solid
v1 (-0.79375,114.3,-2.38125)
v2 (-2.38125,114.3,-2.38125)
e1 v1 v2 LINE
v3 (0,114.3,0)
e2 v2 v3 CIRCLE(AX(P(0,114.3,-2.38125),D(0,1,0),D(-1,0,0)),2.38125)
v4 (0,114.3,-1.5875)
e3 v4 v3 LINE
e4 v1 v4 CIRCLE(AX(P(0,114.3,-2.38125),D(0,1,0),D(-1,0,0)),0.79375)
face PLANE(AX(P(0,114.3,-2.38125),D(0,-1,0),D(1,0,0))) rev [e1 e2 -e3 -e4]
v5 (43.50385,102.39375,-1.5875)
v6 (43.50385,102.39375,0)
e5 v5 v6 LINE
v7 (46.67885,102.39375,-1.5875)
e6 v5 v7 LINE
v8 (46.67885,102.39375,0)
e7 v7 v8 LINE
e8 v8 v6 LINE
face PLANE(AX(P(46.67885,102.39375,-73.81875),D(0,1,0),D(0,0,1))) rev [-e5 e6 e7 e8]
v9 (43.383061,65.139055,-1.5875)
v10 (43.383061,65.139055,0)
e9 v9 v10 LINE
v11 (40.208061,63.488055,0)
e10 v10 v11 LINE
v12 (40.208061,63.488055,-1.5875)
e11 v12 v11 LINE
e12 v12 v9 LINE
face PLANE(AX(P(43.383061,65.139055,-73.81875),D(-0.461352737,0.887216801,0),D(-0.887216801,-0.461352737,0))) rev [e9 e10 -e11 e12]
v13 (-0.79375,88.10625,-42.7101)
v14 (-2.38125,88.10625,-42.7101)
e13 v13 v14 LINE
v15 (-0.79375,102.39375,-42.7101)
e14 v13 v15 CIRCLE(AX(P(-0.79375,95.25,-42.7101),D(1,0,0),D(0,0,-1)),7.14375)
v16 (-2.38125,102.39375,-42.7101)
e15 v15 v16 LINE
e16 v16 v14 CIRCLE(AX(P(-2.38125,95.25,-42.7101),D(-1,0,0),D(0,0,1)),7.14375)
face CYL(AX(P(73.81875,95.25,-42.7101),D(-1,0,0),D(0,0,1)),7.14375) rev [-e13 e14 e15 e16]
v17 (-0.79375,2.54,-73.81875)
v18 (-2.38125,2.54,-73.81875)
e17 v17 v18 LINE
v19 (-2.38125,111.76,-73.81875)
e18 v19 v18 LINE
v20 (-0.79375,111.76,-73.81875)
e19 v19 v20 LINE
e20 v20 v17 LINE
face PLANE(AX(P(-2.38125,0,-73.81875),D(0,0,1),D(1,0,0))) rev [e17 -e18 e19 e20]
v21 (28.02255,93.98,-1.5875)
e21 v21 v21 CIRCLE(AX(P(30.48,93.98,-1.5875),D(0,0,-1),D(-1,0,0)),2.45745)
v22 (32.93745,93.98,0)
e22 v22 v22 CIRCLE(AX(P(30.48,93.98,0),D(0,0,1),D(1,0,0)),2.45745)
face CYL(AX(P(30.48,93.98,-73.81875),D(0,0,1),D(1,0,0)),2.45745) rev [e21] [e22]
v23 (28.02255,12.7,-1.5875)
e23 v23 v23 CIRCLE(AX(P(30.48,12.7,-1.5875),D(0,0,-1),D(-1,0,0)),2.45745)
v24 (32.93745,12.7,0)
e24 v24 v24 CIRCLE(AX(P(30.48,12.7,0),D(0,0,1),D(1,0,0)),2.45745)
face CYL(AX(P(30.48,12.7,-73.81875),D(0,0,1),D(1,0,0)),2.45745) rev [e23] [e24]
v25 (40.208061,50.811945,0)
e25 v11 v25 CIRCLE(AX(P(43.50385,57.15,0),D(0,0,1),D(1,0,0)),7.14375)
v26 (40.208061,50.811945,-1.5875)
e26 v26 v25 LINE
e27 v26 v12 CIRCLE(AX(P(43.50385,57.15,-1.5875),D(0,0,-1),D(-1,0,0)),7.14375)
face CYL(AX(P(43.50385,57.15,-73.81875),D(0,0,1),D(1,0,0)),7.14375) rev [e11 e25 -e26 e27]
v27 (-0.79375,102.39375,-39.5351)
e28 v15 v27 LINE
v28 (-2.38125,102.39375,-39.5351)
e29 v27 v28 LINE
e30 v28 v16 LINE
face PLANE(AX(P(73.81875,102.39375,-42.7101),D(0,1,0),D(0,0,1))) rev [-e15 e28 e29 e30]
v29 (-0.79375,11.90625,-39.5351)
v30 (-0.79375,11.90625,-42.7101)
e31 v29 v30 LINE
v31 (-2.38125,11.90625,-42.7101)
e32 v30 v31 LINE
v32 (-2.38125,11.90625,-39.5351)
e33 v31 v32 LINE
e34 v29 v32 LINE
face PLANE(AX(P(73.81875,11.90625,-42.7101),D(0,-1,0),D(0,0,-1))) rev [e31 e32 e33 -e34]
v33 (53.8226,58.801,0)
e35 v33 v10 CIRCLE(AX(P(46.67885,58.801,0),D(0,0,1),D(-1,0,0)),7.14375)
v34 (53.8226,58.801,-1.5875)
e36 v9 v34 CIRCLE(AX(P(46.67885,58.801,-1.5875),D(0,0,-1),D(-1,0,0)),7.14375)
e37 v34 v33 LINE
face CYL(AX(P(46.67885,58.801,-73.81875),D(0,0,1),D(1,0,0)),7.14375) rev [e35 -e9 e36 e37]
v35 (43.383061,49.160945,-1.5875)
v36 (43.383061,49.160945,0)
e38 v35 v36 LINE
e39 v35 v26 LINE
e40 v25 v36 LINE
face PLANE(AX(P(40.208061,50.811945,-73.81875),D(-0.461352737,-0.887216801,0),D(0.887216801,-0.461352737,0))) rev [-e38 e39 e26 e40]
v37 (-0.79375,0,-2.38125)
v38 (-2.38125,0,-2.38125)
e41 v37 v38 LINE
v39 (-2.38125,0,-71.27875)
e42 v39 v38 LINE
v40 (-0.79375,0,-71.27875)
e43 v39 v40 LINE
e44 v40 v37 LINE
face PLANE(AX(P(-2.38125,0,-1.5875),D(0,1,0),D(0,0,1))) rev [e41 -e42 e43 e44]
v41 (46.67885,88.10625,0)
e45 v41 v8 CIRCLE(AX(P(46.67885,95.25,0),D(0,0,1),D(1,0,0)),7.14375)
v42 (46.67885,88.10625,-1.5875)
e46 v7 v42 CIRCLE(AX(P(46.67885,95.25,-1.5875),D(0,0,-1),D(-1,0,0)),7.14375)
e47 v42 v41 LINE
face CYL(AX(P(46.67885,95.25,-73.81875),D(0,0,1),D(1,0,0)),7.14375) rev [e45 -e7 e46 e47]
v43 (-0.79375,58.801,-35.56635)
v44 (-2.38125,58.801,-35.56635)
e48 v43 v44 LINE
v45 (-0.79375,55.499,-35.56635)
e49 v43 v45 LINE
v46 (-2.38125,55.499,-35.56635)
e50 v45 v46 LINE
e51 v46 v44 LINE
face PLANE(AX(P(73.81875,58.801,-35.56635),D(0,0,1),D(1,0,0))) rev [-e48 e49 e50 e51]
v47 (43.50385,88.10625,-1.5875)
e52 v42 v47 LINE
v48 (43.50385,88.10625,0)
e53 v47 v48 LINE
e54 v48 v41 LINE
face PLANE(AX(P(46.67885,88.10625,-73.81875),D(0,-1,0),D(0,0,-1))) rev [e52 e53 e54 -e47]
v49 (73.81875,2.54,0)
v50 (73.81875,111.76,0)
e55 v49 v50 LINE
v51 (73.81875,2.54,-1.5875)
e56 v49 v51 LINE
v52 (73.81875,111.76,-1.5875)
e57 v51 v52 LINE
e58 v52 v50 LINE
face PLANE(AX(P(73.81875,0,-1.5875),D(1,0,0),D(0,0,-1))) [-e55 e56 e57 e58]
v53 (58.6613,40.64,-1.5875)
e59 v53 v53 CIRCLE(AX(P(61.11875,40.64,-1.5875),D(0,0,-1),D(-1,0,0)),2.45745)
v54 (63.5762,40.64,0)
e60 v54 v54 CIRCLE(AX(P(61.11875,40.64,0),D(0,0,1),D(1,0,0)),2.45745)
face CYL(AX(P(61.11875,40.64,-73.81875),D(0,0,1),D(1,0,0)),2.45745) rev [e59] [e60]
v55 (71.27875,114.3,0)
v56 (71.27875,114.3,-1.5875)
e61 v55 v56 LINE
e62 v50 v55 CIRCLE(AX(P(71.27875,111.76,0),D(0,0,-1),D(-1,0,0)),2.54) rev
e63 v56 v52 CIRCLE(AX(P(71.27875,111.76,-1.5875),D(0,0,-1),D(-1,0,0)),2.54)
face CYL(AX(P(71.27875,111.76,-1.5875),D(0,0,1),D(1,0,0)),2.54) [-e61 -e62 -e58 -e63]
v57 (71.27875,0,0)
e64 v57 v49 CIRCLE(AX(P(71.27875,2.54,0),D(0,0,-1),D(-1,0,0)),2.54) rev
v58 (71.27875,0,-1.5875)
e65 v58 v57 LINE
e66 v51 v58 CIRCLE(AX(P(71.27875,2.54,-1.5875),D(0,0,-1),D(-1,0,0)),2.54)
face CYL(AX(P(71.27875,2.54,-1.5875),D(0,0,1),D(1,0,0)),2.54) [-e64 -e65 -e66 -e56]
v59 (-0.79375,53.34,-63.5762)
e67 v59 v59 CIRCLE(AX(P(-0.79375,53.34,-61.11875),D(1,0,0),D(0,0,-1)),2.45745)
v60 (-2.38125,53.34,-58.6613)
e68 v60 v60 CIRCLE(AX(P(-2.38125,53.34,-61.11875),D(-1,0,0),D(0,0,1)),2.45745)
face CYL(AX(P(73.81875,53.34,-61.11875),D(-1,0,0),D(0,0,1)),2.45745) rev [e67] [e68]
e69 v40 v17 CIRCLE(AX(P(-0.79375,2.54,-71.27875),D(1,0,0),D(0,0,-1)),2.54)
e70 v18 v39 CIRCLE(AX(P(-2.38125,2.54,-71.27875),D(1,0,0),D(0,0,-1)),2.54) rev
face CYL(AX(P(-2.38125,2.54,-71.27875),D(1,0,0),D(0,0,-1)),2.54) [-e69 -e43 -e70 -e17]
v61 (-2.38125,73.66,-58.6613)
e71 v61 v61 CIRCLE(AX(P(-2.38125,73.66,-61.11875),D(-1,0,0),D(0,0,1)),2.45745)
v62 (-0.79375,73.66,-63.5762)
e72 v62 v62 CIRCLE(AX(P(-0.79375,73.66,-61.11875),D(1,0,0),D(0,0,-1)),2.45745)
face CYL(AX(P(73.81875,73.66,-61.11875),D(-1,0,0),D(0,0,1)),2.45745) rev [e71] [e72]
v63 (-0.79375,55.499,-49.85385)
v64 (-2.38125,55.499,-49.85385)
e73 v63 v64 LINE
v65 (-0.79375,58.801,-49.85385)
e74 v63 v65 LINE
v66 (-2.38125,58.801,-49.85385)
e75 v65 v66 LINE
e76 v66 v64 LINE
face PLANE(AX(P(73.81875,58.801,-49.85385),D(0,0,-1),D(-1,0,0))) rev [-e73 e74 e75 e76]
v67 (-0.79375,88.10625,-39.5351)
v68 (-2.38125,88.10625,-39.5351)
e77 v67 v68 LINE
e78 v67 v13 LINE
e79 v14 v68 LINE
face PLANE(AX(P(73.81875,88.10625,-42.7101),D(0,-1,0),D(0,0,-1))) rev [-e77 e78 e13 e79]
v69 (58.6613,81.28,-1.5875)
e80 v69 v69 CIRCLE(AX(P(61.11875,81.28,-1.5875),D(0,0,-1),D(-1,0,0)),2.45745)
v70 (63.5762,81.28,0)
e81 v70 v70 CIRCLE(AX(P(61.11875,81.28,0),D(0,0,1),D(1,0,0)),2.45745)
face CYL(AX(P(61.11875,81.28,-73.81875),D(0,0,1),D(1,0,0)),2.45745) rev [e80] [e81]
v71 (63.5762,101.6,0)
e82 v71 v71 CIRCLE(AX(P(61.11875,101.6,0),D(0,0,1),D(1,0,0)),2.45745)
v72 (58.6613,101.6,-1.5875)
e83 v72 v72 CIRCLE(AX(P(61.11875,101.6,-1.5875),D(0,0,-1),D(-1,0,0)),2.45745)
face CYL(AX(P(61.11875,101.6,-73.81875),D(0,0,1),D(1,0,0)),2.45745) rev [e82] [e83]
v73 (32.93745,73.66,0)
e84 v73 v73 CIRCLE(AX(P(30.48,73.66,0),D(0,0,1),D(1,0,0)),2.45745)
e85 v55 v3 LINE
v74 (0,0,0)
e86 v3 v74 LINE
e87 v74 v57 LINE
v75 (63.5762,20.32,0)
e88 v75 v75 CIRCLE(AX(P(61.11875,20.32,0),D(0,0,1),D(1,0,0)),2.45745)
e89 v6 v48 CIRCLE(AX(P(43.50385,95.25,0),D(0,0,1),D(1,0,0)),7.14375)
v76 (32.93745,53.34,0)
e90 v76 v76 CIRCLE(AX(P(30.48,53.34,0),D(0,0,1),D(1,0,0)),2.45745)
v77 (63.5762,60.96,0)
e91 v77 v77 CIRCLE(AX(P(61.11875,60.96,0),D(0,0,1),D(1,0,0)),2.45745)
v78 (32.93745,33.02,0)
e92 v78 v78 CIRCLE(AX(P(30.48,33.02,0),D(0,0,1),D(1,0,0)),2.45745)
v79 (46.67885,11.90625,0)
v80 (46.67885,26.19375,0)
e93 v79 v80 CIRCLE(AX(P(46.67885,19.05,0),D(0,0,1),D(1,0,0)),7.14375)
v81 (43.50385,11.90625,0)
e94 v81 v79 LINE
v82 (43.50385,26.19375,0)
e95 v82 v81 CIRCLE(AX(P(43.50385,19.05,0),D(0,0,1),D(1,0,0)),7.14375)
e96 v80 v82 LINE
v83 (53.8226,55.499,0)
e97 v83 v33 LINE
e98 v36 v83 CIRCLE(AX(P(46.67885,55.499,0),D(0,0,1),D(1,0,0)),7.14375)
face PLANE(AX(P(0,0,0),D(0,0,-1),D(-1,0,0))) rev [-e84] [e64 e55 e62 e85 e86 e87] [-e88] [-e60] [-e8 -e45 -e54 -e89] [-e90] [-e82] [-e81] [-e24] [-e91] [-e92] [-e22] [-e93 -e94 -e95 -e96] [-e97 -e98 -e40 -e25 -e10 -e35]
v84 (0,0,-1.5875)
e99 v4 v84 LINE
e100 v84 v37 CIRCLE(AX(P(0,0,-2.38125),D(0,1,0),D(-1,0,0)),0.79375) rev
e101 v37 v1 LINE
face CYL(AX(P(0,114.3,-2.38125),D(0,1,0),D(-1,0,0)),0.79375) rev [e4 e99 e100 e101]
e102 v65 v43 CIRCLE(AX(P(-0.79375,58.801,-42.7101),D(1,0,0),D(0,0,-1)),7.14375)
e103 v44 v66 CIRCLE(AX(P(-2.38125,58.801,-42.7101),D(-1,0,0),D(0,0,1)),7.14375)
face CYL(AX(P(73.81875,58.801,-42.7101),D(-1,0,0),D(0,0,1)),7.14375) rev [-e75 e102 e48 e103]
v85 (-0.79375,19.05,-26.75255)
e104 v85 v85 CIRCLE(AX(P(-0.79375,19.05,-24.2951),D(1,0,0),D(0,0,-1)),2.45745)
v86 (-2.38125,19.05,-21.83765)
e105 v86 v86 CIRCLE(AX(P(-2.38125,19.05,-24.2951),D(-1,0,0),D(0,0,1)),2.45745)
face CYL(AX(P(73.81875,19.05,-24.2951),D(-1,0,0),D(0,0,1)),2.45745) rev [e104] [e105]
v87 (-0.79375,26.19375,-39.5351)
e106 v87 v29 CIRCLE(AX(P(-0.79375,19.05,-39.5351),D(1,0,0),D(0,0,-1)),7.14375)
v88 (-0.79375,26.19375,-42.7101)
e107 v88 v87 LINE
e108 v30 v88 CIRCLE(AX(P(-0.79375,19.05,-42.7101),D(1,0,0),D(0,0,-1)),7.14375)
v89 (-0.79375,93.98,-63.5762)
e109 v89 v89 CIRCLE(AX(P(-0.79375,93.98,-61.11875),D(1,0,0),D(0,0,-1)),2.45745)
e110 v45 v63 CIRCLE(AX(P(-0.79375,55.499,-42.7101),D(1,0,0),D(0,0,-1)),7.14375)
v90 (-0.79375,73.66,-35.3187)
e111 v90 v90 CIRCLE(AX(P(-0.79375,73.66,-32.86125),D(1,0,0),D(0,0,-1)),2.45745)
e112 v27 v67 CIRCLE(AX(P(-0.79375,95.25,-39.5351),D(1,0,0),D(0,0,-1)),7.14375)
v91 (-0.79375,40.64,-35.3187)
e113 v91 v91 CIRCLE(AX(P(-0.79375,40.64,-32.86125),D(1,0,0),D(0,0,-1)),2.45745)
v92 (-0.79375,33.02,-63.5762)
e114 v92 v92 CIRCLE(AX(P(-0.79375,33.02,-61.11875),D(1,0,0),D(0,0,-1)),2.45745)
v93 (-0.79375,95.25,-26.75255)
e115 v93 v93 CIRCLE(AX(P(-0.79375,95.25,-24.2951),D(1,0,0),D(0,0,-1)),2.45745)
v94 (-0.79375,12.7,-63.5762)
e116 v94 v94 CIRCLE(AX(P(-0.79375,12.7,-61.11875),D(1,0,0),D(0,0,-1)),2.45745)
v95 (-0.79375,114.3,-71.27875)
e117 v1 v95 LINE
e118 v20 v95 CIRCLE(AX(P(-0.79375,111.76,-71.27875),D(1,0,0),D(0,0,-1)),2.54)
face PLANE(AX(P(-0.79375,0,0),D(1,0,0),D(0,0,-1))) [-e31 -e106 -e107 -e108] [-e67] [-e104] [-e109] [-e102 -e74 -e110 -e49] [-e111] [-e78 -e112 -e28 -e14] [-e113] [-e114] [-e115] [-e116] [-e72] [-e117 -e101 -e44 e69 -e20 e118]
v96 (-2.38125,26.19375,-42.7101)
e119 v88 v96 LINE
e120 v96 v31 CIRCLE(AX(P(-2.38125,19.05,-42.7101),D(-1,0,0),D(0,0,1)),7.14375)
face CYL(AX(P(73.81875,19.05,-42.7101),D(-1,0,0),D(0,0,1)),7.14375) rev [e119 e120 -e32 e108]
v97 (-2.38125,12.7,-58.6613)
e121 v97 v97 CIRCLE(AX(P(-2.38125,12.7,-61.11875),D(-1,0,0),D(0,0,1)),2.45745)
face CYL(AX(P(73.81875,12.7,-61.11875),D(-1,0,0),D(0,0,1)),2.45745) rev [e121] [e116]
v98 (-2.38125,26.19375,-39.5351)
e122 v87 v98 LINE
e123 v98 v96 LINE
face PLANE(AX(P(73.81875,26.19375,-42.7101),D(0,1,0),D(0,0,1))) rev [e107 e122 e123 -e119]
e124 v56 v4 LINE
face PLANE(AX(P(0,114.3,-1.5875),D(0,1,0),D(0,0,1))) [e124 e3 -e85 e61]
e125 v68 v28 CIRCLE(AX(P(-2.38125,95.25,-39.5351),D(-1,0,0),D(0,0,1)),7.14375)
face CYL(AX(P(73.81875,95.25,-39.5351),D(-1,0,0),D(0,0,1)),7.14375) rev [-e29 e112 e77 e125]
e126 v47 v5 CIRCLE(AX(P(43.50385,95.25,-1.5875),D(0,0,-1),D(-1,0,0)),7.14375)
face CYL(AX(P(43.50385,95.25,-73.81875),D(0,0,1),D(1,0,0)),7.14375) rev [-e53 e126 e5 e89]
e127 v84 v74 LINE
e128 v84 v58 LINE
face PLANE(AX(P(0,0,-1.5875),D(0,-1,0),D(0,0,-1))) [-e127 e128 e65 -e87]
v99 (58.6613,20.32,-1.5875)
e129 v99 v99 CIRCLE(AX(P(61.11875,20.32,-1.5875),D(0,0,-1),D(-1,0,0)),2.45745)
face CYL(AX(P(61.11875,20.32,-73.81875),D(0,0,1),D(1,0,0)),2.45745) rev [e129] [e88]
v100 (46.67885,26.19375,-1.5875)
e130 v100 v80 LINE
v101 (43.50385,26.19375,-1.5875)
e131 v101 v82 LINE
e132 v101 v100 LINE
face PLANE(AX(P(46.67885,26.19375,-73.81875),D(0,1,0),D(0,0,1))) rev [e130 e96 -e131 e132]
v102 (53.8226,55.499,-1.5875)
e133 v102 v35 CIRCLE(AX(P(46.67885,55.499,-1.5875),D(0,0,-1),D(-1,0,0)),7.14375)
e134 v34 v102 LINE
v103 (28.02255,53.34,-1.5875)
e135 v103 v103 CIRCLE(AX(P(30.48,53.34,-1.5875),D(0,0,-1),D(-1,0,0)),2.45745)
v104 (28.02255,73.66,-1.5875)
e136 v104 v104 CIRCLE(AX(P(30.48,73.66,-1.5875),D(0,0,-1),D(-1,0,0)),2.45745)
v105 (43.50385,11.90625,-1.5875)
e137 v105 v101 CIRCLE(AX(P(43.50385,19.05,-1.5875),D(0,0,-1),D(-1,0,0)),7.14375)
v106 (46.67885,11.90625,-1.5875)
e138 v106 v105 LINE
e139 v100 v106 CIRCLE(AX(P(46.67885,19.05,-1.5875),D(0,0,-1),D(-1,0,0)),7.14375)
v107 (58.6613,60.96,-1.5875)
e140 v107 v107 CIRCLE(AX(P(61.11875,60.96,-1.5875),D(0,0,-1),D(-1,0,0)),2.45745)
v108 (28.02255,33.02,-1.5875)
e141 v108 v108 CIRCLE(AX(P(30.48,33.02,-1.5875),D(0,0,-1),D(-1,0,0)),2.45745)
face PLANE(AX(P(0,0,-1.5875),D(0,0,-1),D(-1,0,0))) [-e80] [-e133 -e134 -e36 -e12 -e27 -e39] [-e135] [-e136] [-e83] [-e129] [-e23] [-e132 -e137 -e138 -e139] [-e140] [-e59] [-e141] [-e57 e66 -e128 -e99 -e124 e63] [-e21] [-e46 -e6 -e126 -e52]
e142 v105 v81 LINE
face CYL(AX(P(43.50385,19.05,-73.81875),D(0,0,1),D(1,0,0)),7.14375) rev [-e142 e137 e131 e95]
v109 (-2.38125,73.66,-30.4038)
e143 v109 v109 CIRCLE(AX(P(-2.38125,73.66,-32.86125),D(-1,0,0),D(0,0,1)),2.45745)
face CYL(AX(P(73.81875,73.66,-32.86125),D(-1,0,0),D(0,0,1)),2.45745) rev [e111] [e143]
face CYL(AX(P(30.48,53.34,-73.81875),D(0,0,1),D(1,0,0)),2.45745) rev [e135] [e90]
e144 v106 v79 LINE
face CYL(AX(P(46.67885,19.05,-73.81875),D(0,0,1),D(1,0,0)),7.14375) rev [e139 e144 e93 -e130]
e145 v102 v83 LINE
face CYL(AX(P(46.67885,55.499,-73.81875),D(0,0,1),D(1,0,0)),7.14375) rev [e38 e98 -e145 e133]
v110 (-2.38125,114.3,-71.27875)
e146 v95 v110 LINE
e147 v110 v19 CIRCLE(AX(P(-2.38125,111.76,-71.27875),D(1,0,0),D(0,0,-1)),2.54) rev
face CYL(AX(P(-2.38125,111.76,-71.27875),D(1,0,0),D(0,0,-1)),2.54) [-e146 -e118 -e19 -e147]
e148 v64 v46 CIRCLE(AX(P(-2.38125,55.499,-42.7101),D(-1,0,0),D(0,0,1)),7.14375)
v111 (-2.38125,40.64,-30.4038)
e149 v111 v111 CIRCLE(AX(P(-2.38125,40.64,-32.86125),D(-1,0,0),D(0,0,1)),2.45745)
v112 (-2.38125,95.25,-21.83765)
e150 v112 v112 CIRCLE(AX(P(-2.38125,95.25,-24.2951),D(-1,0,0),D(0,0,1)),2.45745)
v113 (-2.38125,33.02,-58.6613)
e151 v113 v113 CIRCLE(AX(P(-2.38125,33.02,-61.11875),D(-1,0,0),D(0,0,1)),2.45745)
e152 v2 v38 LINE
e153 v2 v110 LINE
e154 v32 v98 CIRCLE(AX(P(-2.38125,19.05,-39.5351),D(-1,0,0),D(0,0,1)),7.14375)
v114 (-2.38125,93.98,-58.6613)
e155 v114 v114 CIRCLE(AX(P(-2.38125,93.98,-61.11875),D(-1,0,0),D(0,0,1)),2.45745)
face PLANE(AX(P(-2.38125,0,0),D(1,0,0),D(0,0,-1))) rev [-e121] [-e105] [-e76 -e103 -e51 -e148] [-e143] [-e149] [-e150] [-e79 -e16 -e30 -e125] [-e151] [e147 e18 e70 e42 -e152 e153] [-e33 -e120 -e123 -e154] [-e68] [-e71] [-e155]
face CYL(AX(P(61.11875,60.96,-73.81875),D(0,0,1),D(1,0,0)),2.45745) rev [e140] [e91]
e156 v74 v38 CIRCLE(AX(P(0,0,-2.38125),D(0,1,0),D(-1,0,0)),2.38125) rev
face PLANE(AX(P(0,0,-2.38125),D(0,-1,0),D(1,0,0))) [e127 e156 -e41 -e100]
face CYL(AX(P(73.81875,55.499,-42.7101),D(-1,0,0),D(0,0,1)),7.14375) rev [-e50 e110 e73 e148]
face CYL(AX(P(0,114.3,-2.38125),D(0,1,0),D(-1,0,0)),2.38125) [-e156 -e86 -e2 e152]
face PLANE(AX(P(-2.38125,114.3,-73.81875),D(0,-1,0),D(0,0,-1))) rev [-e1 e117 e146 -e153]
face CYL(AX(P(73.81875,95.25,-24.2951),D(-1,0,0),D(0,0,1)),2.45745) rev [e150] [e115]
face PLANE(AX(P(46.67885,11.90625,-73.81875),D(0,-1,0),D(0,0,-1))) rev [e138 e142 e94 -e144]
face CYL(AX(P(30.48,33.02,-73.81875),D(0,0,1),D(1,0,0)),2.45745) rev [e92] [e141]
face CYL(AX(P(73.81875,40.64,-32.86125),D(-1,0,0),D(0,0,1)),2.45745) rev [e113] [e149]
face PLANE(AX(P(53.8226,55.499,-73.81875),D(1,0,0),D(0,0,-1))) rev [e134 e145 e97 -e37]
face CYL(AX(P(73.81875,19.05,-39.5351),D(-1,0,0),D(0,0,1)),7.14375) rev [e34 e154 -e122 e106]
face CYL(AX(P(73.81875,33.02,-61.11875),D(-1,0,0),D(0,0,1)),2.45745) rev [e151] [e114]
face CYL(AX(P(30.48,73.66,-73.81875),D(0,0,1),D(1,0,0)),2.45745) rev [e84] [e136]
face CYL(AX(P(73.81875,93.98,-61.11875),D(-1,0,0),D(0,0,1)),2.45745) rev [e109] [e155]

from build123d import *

# Parameters (mm, degrees)
SKETCH1_W          = 73.81875
SKETCH1_H          = 114.3
BASE_FLANGE1_DEPTH = 1.5875
EDGE_FLANGE1_DEPTH = 114.3
SKETCH11_R         = 2.45745
CUT_EXTRUDE1_DEPTH = 155.799566224
SKETCH12_R         = 2.45745
CUT_EXTRUDE2_DEPTH = 156.949151494
FILLET1_R          = 2.54


# Sheet-metal steps are written as plain solids
with BuildPart() as part:
    # Sketch1 → Base-Flange1 (new body)
    with BuildSketch(Plane.XY):
        with Locations((36.909375, 57.15)):
            Rectangle(SKETCH1_W, SKETCH1_H)
    extrude(amount=-BASE_FLANGE1_DEPTH)

    # Edge-Flange1 section (across the edge) → Edge-Flange1 (add)
    with BuildSketch(Plane(origin=(-0.79375, 0, -1.5875), x_dir=(1, 0, 0), z_dir=(0, 1, 0))):
        with BuildLine():
            Line((-1.5875, 0.79375), (-1.5875, 72.23125))
            Line((-1.5875, 72.23125), (0, 72.23125))
            Line((0, 72.23125), (0, 0.79375))
            ThreePointArc((0, 0.79375), (0.232483992, 0.232483992), (0.79375, 0))
            Line((0.79375, 0), (0.79375, -1.5875))
            ThreePointArc((0.79375, -1.5875), (-0.890048023, -0.890048023), (-1.5875, 0.79375))
        make_face()
    extrude(amount=EDGE_FLANGE1_DEPTH)

    # Sketch11 → Cut-Extrude1 (cut, through all)
    with BuildSketch(Plane.XY):
        with Locations((30.48, 12.7)):
            Circle(SKETCH11_R)
        with Locations((30.48, 33.02)):
            Circle(SKETCH11_R)
        with Locations((30.48, 53.34)):
            Circle(SKETCH11_R)
        with Locations((30.48, 73.66)):
            Circle(SKETCH11_R)
        with Locations((30.48, 93.98)):
            Circle(SKETCH11_R)
        with Locations((61.11875, 101.6)):
            Circle(SKETCH11_R)
        with Locations((61.11875, 81.28)):
            Circle(SKETCH11_R)
        with Locations((61.11875, 60.96)):
            Circle(SKETCH11_R)
        with Locations((61.11875, 40.64)):
            Circle(SKETCH11_R)
        with Locations((61.11875, 20.32)):
            Circle(SKETCH11_R)
        with BuildLine():
            Line((46.67885, 88.10625), (43.50385, 88.10625))
            ThreePointArc((43.50385, 88.10625), (36.3601, 95.25), (43.50385, 102.39375))
            Line((43.50385, 102.39375), (46.67885, 102.39375))
            ThreePointArc((46.67885, 102.39375), (53.8226, 95.25), (46.67885, 88.10625))
        make_face()
        with BuildLine():
            Line((46.67885, 11.90625), (43.50385, 11.90625))
            ThreePointArc((43.50385, 11.90625), (36.3601, 19.05), (43.50385, 26.19375))
            Line((43.50385, 26.19375), (46.67885, 26.19375))
            ThreePointArc((46.67885, 26.19375), (53.8226, 19.05), (46.67885, 11.90625))
        make_face()
        with BuildLine():
            Line((43.383061388, 65.139055024), (40.208061388, 63.488055024))
            ThreePointArc((40.208061388, 63.488055024), (36.3601, 57.15), (40.208061388, 50.811944976))
            Line((40.208061388, 50.811944976), (43.383061388, 49.160944976))
            ThreePointArc((43.383061388, 49.160944976), (50.386199064, 49.392550378), (53.8226, 55.499))
            Line((53.8226, 55.499), (53.8226, 58.801))
            ThreePointArc((53.8226, 58.801), (50.386199064, 64.907449622), (43.383061388, 65.139055024))
        make_face()
    extrude(amount=-CUT_EXTRUDE1_DEPTH, mode=Mode.SUBTRACT)

    # Sketch12 → Cut-Extrude2 (cut, through all)
    with BuildSketch(Plane.ZY.offset(2.38125)):
        with Locations((-61.11875, 12.7)):
            Circle(SKETCH12_R)
        with Locations((-61.11875, 33.02)):
            Circle(SKETCH12_R)
        with Locations((-61.11875, 53.34)):
            Circle(SKETCH12_R)
        with Locations((-61.11875, 73.66)):
            Circle(SKETCH12_R)
        with Locations((-61.11875, 93.98)):
            Circle(SKETCH12_R)
        with Locations((-32.86125, 73.66)):
            Circle(SKETCH12_R)
        with Locations((-32.86125, 40.64)):
            Circle(SKETCH12_R)
        with Locations((-24.2951, 95.25)):
            Circle(SKETCH12_R)
        with Locations((-24.2951, 19.05)):
            Circle(SKETCH12_R)
        with BuildLine():
            Line((-35.56635, 58.801), (-35.56635, 55.499))
            ThreePointArc((-35.56635, 55.499), (-42.7101, 48.35525), (-49.85385, 55.499))
            Line((-49.85385, 55.499), (-49.85385, 58.801))
            ThreePointArc((-49.85385, 58.801), (-42.7101, 65.94475), (-35.56635, 58.801))
        make_face()
        with BuildLine():
            Line((-42.7101, 102.39375), (-39.5351, 102.39375))
            ThreePointArc((-39.5351, 102.39375), (-32.39135, 95.25), (-39.5351, 88.10625))
            Line((-39.5351, 88.10625), (-42.7101, 88.10625))
            ThreePointArc((-42.7101, 88.10625), (-49.85385, 95.25), (-42.7101, 102.39375))
        make_face()
        with BuildLine():
            Line((-42.7101, 26.19375), (-39.5351, 26.19375))
            ThreePointArc((-39.5351, 26.19375), (-32.39135, 19.05), (-39.5351, 11.90625))
            Line((-39.5351, 11.90625), (-42.7101, 11.90625))
            ThreePointArc((-42.7101, 11.90625), (-49.85385, 19.05), (-42.7101, 26.19375))
        make_face()
    extrude(amount=-CUT_EXTRUDE2_DEPTH, mode=Mode.SUBTRACT)

    # Fillet1
    fillet1_edges = [part.edges().sort_by_distance(p)[0] for p in [
        (-1.5875, 0, -73.81875),
        (-1.5875, 114.3, -73.81875),
        (73.81875, 114.3, -0.79375),
        (73.81875, 0, -0.79375),
    ]]
    fillet(fillet1_edges, radius=FILLET1_R)


solid = part.part
